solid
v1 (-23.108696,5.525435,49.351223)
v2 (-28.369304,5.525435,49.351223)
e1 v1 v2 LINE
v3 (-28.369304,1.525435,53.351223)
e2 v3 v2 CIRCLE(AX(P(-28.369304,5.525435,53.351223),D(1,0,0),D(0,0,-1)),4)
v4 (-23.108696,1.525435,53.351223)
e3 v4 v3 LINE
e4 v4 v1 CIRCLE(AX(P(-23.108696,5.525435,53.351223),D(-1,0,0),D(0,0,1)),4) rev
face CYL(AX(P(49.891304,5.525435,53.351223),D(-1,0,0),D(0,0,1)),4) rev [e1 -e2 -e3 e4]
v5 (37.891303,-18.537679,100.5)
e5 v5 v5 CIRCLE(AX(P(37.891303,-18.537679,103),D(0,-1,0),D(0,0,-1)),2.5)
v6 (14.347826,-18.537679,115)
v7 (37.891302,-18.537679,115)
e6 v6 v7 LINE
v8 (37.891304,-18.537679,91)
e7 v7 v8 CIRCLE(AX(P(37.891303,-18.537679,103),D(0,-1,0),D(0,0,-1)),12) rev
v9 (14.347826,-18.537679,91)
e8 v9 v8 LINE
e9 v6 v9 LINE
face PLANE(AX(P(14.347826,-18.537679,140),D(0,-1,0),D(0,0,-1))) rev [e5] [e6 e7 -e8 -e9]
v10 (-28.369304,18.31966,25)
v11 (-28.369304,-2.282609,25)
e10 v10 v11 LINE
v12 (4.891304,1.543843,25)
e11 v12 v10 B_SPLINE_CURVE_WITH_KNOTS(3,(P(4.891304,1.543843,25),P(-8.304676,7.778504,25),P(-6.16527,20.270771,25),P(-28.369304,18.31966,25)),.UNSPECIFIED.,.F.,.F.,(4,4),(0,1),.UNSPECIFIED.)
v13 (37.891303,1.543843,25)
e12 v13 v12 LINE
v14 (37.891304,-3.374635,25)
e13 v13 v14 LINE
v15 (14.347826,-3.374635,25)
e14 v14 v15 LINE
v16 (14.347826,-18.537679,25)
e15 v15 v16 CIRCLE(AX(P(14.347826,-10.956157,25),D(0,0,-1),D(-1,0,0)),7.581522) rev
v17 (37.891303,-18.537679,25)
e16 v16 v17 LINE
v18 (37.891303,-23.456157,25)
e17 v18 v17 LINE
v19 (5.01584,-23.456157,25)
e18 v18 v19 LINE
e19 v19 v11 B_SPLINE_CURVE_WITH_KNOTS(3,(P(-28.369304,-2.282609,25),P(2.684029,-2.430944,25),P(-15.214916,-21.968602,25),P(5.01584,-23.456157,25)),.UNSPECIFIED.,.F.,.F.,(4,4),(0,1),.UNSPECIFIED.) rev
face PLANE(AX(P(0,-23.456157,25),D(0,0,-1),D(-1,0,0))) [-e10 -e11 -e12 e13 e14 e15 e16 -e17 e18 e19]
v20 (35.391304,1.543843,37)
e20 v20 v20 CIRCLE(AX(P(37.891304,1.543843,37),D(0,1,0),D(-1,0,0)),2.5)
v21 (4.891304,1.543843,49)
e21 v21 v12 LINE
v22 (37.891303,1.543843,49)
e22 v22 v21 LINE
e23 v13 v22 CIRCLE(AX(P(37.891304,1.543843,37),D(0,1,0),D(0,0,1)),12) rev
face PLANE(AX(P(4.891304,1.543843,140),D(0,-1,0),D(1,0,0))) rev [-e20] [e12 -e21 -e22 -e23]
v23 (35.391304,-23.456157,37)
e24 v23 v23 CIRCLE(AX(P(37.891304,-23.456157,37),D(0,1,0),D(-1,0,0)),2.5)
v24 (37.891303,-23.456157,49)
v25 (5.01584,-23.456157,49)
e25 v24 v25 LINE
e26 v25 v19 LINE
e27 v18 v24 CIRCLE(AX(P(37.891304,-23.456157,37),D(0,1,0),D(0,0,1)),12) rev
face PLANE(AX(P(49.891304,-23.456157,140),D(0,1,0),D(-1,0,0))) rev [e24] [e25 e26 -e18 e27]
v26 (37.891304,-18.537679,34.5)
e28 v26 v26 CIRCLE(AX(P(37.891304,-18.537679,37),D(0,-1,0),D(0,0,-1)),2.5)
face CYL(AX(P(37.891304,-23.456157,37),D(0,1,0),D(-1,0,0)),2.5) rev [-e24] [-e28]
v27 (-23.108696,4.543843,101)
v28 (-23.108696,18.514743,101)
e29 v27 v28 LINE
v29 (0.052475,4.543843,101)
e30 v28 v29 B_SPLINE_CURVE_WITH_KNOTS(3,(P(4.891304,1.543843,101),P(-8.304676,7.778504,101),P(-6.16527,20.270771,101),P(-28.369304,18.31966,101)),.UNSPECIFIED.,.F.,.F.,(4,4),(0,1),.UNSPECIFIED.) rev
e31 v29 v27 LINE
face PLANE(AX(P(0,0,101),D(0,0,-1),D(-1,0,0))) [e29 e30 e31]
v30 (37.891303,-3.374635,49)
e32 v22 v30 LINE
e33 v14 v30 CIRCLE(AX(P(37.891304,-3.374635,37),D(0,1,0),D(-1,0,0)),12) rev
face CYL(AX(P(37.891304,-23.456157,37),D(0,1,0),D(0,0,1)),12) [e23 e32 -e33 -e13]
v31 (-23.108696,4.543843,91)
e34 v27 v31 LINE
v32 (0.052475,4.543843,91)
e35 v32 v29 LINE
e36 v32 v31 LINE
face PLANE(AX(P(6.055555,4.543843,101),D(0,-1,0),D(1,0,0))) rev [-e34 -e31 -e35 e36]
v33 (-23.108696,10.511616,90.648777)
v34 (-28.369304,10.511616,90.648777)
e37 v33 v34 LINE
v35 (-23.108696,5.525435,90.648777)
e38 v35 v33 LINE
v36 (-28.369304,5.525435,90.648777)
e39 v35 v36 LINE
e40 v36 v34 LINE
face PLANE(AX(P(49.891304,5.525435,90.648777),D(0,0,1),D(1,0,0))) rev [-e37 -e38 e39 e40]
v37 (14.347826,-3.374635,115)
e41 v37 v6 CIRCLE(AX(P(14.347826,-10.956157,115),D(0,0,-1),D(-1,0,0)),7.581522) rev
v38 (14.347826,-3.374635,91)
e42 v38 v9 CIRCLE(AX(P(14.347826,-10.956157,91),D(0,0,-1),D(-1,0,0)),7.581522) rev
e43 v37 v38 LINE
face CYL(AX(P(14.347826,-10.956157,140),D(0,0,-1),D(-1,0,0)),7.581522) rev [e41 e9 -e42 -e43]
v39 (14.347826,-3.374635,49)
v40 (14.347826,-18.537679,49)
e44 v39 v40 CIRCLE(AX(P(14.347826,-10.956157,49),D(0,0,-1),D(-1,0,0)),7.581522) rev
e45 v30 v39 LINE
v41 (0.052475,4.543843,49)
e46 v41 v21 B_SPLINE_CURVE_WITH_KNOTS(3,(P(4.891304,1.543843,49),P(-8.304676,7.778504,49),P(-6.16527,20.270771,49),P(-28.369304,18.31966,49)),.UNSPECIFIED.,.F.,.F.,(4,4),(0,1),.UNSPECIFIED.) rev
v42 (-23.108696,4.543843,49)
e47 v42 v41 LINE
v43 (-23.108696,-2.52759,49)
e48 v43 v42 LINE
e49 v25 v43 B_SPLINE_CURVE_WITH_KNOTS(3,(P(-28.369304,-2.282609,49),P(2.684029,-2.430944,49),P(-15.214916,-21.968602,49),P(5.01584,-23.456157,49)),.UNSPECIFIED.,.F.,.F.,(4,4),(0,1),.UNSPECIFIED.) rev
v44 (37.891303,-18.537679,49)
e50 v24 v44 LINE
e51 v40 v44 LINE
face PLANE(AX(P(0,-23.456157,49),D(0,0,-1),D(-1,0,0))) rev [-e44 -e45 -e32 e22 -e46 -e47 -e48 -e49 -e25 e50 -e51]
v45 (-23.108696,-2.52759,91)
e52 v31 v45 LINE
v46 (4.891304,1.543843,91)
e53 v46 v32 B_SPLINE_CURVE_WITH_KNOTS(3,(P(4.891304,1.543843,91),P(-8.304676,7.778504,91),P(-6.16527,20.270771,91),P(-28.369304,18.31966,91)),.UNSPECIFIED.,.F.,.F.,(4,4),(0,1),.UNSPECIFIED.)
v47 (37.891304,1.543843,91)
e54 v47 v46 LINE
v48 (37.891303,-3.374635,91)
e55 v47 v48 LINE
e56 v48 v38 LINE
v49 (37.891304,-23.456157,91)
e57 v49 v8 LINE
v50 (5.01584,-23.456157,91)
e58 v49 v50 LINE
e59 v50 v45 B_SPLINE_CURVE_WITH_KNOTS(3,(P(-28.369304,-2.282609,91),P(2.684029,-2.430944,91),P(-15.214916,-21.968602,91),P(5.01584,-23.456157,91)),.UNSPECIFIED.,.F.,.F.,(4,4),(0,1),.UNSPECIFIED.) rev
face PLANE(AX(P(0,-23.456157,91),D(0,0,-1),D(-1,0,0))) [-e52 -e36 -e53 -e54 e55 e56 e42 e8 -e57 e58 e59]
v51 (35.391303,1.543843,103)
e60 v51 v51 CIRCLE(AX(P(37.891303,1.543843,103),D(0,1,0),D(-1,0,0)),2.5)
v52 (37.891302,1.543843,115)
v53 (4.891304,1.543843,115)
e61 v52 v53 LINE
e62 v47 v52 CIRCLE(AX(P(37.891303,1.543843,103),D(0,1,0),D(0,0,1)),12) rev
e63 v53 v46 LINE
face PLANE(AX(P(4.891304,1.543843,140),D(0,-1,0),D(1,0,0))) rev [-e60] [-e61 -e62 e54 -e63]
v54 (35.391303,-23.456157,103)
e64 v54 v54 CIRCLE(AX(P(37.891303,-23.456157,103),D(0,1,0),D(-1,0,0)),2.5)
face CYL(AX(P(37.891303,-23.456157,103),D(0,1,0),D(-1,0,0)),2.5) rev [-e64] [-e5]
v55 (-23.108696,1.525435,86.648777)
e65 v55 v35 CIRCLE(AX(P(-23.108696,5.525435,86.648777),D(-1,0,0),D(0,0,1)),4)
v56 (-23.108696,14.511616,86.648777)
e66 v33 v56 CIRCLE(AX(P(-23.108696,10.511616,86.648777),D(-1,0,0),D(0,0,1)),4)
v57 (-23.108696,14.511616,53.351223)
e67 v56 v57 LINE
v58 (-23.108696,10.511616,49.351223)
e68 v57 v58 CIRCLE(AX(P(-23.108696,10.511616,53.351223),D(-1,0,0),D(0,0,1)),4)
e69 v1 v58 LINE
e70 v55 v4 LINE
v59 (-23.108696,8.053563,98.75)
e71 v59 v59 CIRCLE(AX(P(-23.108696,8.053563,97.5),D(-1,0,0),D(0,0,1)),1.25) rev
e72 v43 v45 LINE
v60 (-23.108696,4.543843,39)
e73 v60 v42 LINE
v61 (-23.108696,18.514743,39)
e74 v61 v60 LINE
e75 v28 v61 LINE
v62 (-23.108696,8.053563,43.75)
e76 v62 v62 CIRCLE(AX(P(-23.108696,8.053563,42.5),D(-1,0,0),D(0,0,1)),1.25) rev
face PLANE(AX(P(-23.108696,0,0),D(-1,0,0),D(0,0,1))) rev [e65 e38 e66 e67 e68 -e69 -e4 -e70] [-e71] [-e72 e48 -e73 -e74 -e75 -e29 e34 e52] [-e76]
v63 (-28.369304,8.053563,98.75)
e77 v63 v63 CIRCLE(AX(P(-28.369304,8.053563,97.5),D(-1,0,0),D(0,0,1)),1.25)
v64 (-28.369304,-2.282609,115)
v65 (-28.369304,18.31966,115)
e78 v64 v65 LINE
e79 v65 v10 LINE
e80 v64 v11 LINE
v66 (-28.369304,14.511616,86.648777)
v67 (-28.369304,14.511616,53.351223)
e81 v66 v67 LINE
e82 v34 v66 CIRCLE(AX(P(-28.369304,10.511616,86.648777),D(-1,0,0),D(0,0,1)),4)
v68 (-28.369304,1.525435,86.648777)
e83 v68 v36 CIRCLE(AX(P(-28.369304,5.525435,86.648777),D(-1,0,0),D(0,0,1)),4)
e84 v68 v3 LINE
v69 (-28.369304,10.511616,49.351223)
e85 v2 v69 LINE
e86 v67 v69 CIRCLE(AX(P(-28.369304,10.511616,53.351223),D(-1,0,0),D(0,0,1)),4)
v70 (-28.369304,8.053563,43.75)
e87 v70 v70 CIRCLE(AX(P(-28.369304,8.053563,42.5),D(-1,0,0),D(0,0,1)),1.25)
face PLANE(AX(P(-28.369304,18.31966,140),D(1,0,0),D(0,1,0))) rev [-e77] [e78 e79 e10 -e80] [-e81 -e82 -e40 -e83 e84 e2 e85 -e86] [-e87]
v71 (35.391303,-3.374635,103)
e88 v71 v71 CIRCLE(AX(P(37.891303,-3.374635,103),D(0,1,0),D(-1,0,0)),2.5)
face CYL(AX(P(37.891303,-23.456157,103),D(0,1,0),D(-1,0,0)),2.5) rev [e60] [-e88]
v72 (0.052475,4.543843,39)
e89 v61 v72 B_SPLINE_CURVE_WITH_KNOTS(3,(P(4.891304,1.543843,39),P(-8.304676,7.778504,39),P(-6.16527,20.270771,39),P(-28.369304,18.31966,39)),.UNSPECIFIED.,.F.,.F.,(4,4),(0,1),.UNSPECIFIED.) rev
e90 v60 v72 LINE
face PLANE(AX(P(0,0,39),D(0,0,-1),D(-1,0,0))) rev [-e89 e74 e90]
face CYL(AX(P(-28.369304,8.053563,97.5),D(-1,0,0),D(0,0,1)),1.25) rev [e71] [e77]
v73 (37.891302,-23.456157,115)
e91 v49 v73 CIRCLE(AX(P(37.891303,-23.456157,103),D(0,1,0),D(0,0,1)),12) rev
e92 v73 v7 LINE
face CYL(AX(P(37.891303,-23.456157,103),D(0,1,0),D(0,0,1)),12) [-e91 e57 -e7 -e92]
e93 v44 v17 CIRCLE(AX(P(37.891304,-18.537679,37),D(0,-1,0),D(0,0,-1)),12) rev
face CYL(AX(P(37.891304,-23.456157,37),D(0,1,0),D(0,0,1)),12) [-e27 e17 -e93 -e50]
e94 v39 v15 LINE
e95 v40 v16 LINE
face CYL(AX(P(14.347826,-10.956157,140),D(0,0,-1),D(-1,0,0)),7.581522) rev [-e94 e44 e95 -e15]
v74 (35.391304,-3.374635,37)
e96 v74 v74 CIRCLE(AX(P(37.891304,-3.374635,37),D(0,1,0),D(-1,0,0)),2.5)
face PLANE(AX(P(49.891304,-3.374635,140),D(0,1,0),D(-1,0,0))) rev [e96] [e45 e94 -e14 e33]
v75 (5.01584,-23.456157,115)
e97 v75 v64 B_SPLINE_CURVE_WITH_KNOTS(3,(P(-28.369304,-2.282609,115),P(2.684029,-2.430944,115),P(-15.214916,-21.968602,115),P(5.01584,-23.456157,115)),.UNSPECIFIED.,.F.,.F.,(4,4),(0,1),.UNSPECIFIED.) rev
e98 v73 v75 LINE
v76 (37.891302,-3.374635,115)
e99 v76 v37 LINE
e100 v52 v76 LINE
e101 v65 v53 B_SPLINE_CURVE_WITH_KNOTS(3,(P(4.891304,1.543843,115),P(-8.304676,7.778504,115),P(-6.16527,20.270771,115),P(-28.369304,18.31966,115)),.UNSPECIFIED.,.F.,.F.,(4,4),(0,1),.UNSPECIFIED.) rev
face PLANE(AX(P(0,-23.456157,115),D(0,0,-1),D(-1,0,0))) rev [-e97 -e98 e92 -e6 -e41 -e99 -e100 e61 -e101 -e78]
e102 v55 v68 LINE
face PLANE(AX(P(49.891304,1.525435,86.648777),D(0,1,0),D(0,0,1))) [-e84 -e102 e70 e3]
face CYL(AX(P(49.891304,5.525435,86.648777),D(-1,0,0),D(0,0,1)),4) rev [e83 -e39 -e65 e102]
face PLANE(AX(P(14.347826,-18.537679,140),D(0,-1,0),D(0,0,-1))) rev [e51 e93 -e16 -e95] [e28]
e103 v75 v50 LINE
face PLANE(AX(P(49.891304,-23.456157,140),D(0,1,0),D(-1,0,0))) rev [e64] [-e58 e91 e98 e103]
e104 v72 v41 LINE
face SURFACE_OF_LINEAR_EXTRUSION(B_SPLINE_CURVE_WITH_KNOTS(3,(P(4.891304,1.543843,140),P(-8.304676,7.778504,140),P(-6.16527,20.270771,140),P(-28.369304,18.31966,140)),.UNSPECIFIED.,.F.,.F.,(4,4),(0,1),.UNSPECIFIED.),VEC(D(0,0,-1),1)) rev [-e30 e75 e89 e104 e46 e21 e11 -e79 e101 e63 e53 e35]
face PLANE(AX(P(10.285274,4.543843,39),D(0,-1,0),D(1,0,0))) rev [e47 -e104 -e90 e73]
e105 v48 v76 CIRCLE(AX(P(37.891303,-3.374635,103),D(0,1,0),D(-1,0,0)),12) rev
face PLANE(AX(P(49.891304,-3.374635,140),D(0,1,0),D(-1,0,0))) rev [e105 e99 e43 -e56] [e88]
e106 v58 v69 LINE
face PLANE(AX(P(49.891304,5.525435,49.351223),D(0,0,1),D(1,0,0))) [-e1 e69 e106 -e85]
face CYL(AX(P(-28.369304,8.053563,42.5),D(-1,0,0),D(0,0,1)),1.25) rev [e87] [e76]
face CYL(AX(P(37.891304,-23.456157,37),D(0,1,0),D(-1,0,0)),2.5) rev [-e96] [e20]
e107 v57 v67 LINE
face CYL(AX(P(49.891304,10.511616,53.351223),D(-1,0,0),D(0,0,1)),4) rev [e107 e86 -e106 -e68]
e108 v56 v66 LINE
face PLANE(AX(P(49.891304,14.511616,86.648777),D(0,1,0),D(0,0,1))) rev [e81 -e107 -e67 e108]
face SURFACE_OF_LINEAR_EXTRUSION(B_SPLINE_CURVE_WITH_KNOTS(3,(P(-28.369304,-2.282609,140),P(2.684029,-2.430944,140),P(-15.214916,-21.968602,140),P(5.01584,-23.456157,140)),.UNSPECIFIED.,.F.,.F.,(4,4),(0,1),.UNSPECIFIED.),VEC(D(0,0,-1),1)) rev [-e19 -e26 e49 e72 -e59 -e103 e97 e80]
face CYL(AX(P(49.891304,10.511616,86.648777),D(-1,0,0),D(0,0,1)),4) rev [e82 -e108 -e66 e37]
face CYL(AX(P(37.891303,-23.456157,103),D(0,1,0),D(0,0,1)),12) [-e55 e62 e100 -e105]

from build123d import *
from OCP.BRepAlgoAPI import BRepAlgoAPI_Cut
from OCP.TopTools import TopTools_ListOfShape

# Parameters (mm, degrees)
BOSS_EXTRUDE1_DEPTH = 140
SKETCH2_W           = 45
SKETCH2_H           = 25
SKETCH2_H_2         = 42
CUT_EXTRUDE1_DEPTH  = 151.712117272
SKETCH3_W           = 25
SKETCH3_H           = 58.39699261
SKETCH3_H_2         = 53.941763905
CUT_EXTRUDE2_DEPTH  = 149.913368614
CUT_EXTRUDE3_START  = -25
CUT_EXTRUDE3_DEPTH  = 25
SKETCH5_R           = 2.5
CUT_EXTRUDE4_DEPTH  = 128.82465442
SKETCH6_W           = 42
SKETCH6_H           = 41.970965134
CUT_EXTRUDE5_DEPTH  = 28
M3_TAPPED_HOLE1_D   = 2.5
CUT_EXTRUDE7_DEPTH  = 10
CUT_EXTRUDE8_DEPTH  = 10
CUT_EXTRUDE9_DEPTH  = 142.067055339


with BuildPart() as part:
    # Sketch1 → Boss-Extrude1 (new body)
    with BuildSketch(Plane.XY):
        with BuildLine():
            Line((-28.369303649, 18.31966037), (-28.369303649, -2.282608696))
            add(Edge.make_bspline(
                [(-28.369303649, -2.282608696), (2.684029018, -2.430944497), (-15.214915802, -21.968601645), (5.015839683, -23.456157195)],
                knots=[0, 0, 0, 0, 1, 1, 1, 1], degree=3))
            Line((5.015839683, -23.456157195), (49.891304348, -23.456157195))
            Line((49.891304348, -23.456157195), (49.891304348, -18.537678935))
            Line((49.891304348, -18.537678935), (14.347826087, -18.537678935))
            ThreePointArc((14.347826087, -18.537678935), (6.766304348, -10.956157195), (14.347826087, -3.374635456))
            Line((14.347826087, -3.374635456), (49.891304348, -3.374635456))
            Line((49.891304348, -3.374635456), (49.891304348, 1.543842805))
            Line((49.891304348, 1.543842805), (4.891304348, 1.543842805))
            add(Edge.make_bspline(
                [(-28.369303649, 18.31966037), (-6.165269931, 20.270771045), (-8.304675764, 7.778503855), (4.891304348, 1.543842805)],
                knots=[0, 0, 0, 0, 1, 1, 1, 1], degree=3))
        make_face()
    extrude(amount=BOSS_EXTRUDE1_DEPTH)

    # Sketch2 → Cut-Extrude1 (cut, through all)
    with BuildSketch(Plane(origin=(0, 1.543842805, 0), x_dir=(1, 0, 0), z_dir=(0, 1, 0))):
        with Locations((27.391304348, -12.5)):
            Rectangle(SKETCH2_W, SKETCH2_H)
        with Locations((27.391304348, -70)):
            Rectangle(SKETCH2_W, SKETCH2_H_2)
        with Locations((27.391304348, -127.5)):
            Rectangle(SKETCH2_W, SKETCH2_H)
    extrude(amount=-CUT_EXTRUDE1_DEPTH, mode=Mode.SUBTRACT)

    # Sketch3 → Cut-Extrude2 (cut, through all)
    with BuildSketch(Plane(origin=(4.891304348, 0, 0), x_dir=(0, 0, -1), z_dir=(1, 0, 0))):
        with Locations((-127.5, 5.751761195)):
            Rectangle(SKETCH3_W, SKETCH3_H)
        with Locations((-12.5, 3.524146843)):
            Rectangle(SKETCH3_W, SKETCH3_H_2)
    extrude(amount=-CUT_EXTRUDE2_DEPTH, mode=Mode.SUBTRACT)


with BuildPart() as cut_extrude3_tool:
    # Cut-Extrude3: read off the stored shape, not the designer's step
    # Cut-Extrude3 outline → Cut-Extrude3 (new body)
    with BuildSketch(Plane(origin=(0, 1.543842805, 0), x_dir=(1, 0, 0), z_dir=(0, 1, 0)).offset(CUT_EXTRUDE3_START)):
        with BuildLine():
            ThreePointArc((37.891304348, -91), (46.376584834, -94.514719112), (49.891302974, -103))
            Line((49.891302974, -103), (49.891304348, -91))
            Line((49.891304348, -91), (37.891304348, -91))
        make_face()
        with BuildLine():
            ThreePointArc((49.891302974, -103), (46.376583863, -111.48528186), (37.891301601, -115))
            Line((37.891301601, -115), (49.891304348, -115))
            Line((49.891304348, -115), (49.891302974, -103))
        make_face()
        with BuildLine():
            ThreePointArc((37.891303148, -25), (46.376585298, -28.514718201), (49.891304348, -37))
            Line((49.891304348, -37), (49.891304348, -25))
            Line((49.891304348, -25), (37.891303148, -25))
        make_face()
        with BuildLine():
            ThreePointArc((49.891304348, -37), (46.376585294, -45.485281802), (37.891303138, -49))
            Line((37.891303138, -49), (49.891304348, -49))
            Line((49.891304348, -49), (49.891304348, -37))
        make_face()
    extrude(amount=CUT_EXTRUDE3_DEPTH)


with BuildPart() as part_1:
    add(part.part)

    # Cut-Extrude3: cut by cut_extrude3_tool, with a tolerance
    cut_extrude3_stock = TopTools_ListOfShape()
    cut_extrude3_stock.Append(part_1.part.wrapped)
    cut_extrude3_tools = TopTools_ListOfShape()
    cut_extrude3_tools.Append(cut_extrude3_tool.part.wrapped)
    cut_extrude3_cut = BRepAlgoAPI_Cut()
    cut_extrude3_cut.SetArguments(cut_extrude3_stock)
    cut_extrude3_cut.SetTools(cut_extrude3_tools)
    cut_extrude3_cut.SetFuzzyValue(0.00001)
    cut_extrude3_cut.Build()
    add(Compound.cast(cut_extrude3_cut.Shape()).solids(), mode=Mode.REPLACE)

    # Sketch5 → Cut-Extrude4 (cut, through all)
    with BuildSketch(Plane(origin=(0, 1.543842805, 0), x_dir=(1, 0, 0), z_dir=(0, 1, 0))):
        with Locations(Location((37.891304348, -37, 0), (0, 0, 180))):
            Circle(SKETCH5_R)
        with Locations(Location((37.891302974, -103, 0), (0, 0, 180))):
            Circle(SKETCH5_R)
    extrude(amount=-CUT_EXTRUDE4_DEPTH, mode=Mode.SUBTRACT)

    # Sketch6 → Cut-Extrude5 (cut)
    with BuildSketch(Plane(origin=(4.891304348, 0, 0), x_dir=(0, 0, -1), z_dir=(1, 0, 0))):
        with Locations((-70, -2.461252543)):
            Rectangle(SKETCH6_W, SKETCH6_H)
    extrude(amount=-CUT_EXTRUDE5_DEPTH, mode=Mode.SUBTRACT)

    # M3 Tapped Hole1 (through all)
    with Locations(Plane(origin=(-28.369303649, 8.053562831, 42.5), x_dir=(0, -1, 0), z_dir=(-1, 0, 0))):
        with Locations((0, 0), (0, 55)):
            Hole(M3_TAPPED_HOLE1_D / 2)

    # Sketch10 → Cut-Extrude7 (cut)
    with BuildSketch(Plane(origin=(0, 0, 91), x_dir=(-1, 0, 0), z_dir=(0, 0, -1))):
        Polygon((-6.055554522, 4.543842805), (23.108695652, 4.543842805), (23.108695652, 21.156391706), (-12.385539101, 21.156391706), align=None)
    extrude(amount=-CUT_EXTRUDE7_DEPTH, mode=Mode.SUBTRACT)

    # Sketch12 → Cut-Extrude8 (cut)
    with BuildSketch(Plane.XY.offset(49)):
        Polygon((10.285273621, 4.543842805), (-23.108695652, 4.543842805), (-23.108695652, 23.852692611), (13.93451424, 23.852692611), align=None)
    extrude(amount=-CUT_EXTRUDE8_DEPTH, mode=Mode.SUBTRACT)

    # Sketch13 → Cut-Extrude9 (cut, through all)
    with BuildSketch(Plane.ZY.offset(28.369303649)):
        with BuildLine():
            Line((86.648776757, 1.525435208), (53.351223243, 1.525435208))
            ThreePointArc((53.351223243, 1.525435208), (50.522796118, 2.697008083), (49.351223243, 5.525435208))
            Line((49.351223243, 5.525435208), (49.351223243, 10.511616467))
            ThreePointArc((49.351223243, 10.511616467), (50.522796118, 13.340043592), (53.351223243, 14.511616467))
            Line((53.351223243, 14.511616467), (86.648776757, 14.511616467))
            ThreePointArc((86.648776757, 14.511616467), (89.477203882, 13.340043592), (90.648776757, 10.511616467))
            Line((90.648776757, 10.511616467), (90.648776757, 5.525435208))
            ThreePointArc((90.648776757, 5.525435208), (89.477203882, 2.697008083), (86.648776757, 1.525435208))
        make_face()
    extrude(amount=-CUT_EXTRUDE9_DEPTH, mode=Mode.SUBTRACT)


solid = part_1.part
